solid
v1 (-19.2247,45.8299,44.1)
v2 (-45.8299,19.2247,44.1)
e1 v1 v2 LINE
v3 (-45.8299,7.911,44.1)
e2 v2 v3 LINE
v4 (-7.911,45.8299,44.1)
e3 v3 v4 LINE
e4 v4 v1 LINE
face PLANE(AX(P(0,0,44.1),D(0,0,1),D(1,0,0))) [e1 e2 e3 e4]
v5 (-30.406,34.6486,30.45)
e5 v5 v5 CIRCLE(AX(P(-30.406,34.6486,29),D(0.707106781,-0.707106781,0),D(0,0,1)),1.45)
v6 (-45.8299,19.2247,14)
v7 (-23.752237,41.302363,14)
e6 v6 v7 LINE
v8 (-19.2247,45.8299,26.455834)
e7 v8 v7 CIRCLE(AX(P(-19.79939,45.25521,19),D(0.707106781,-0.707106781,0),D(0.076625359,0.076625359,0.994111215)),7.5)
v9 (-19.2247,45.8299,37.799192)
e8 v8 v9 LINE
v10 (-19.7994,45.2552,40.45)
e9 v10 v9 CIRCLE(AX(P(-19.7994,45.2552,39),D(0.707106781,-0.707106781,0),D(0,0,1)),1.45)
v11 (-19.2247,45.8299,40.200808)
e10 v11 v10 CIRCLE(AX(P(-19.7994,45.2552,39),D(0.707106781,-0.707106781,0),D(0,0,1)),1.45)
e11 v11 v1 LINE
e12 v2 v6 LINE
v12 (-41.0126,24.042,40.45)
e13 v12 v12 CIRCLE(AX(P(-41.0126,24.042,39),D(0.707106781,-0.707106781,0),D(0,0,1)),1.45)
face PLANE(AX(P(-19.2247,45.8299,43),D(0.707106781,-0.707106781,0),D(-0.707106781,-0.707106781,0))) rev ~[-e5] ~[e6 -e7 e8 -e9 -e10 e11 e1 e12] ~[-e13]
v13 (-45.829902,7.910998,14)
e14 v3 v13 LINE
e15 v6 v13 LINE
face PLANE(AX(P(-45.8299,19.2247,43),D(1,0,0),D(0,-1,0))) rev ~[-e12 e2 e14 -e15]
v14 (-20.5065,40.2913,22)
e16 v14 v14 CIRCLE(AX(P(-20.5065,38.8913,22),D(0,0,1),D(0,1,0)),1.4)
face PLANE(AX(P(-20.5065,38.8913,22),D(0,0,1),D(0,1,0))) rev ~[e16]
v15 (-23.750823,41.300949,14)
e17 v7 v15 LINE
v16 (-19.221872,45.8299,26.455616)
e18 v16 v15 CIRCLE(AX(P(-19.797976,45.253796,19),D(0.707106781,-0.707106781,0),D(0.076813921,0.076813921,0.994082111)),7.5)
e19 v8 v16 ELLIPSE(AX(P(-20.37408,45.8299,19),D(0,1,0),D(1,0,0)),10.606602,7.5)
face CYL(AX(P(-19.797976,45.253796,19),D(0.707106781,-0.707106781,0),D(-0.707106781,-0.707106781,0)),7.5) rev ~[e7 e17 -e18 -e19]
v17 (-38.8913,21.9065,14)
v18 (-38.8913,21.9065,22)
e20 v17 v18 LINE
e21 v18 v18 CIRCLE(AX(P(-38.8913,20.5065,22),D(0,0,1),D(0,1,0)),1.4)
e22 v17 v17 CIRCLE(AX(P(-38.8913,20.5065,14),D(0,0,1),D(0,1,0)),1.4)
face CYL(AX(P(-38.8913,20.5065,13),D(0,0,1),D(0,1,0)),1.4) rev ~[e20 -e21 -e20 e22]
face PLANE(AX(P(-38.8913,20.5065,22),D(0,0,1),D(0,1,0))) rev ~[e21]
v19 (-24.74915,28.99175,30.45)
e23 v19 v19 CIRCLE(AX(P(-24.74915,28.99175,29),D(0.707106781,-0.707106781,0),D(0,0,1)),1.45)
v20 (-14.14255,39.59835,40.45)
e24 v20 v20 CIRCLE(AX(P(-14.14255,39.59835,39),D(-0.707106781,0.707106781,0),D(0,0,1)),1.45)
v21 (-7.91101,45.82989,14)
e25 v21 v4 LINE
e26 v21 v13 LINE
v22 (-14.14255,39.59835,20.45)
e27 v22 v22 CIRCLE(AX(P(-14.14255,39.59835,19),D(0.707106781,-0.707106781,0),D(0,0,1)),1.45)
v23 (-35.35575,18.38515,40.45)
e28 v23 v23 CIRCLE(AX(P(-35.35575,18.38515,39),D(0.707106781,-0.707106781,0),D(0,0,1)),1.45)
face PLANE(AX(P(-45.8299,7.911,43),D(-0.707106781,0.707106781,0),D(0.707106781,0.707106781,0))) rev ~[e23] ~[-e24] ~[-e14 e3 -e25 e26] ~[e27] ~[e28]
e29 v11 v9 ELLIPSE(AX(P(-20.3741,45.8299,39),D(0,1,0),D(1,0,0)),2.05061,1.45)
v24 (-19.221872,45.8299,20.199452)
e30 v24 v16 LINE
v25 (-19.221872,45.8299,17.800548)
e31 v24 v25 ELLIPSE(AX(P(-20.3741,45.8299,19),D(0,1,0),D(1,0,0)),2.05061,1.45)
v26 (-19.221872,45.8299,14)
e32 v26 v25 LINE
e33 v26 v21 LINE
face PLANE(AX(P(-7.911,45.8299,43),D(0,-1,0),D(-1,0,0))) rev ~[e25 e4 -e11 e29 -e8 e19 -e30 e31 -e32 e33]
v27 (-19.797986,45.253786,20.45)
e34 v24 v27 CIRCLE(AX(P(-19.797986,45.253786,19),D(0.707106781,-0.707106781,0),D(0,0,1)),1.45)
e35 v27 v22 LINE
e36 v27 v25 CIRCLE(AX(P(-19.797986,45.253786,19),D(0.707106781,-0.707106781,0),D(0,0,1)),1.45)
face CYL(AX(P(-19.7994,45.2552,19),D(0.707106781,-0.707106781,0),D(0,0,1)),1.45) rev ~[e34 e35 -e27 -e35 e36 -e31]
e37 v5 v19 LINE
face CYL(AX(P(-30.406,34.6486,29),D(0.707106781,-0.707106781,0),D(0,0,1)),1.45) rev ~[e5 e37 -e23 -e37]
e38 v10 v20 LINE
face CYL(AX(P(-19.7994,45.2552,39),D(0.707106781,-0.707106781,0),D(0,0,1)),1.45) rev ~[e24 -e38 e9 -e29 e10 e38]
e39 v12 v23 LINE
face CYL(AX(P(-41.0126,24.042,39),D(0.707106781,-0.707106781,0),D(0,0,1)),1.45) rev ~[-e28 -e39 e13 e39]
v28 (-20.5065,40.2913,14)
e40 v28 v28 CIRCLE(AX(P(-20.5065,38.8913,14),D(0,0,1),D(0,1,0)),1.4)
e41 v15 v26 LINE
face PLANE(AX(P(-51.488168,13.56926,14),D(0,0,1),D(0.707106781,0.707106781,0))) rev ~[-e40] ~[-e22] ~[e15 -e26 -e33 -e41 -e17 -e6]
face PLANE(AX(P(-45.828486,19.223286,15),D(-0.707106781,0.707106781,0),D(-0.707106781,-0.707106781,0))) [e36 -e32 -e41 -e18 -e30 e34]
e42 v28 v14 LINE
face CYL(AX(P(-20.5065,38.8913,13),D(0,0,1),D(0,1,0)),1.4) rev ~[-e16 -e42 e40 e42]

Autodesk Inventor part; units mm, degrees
ref_plane "YZ Plane" through (0, 0, 0) normal (1, 0, 0) x (0, 1, 0)
ref_plane "Work Plane1" through (0, 0, 10) normal (0, 0, 1) x (1, 0, 0)
sketch "Sketch1" plane through (0, 0, 10) normal (0, 0, 1) x (1, 0, 0)
  line L0 (-4.0299, -0.3538) -> (-2.2322, 1.4439) construction
  arc A0 (-1.4439, 2.2322) -> (-2.2322, 1.4439) centre (-0.9299, 0.9299) ccw construction
  line L1 (-1.4439, 2.2322) -> (0.3538, 4.0299) construction
  line L2 (-37.8299, 42.8299) -> (-37.8299, 37.8299) construction
  line L3 (-37.8299, 37.8299) -> (-42.9208, 37.8299) construction
  line L4 (-37.8299, 42.2137) -> (-37.8299, 45.8299) construction
  line L5 (-37.8299, 45.8299) -> (-4.0299, 45.8299) construction
  line L6 (-4.0299, 45.8299) -> (-4.0299, 42.2137) construction
  line L7 (-4.0299, 4.0299) -> (0.3538, 4.0299) projected
  circle A1 centre (-20.9299, 20.9299) radius 17.5 projected
  line L8 (-20.9299, 58.9723) -> (17.1124, 20.9299) construction
  line L9 (17.1124, 20.9299) -> (-20.9299, -17.1124) construction
  line L10 (-20.9299, -17.1124) -> (-58.9723, 20.9299) construction
  line L11 (-58.9723, 20.9299) -> (-20.9299, 58.9723) construction
  line L12 (-20.9299, 58.9723) -> (-20.9299, -17.1124) construction
  line L13 (17.1124, 20.9299) -> (-58.9723, 20.9299) construction
  line L14 (-20.9299, 58.9723) -> (32.8701, 58.9723) construction
  line L15 (-43.4299, 43.4299) -> (1.5701, 43.4299) construction
  line L16 (1.5701, 43.4299) -> (1.5701, -1.5701) construction
  line L17 (1.5701, -1.5701) -> (-43.4299, -1.5701) construction
  line L18 (-43.4299, -1.5701) -> (-43.4299, 43.4299) construction
  line L19 (-43.4299, 43.4299) -> (1.5701, -1.5701) construction
  line L20 (1.5701, 43.4299) -> (-43.4299, -1.5701) construction
  line L21 (-43.4299, 5.3876) -> (-43.4299, 36.4723)
  line L22 (-43.4299, 36.4723) -> (-36.4723, 43.4299)
  line L23 (-36.4723, 43.4299) -> (-5.3876, 43.4299)
  line L24 (-5.3876, 43.4299) -> (1.5701, 36.4723)
  line L25 (1.5701, 36.4723) -> (1.5701, 5.3876)
  line L26 (1.5701, 5.3876) -> (-5.3876, -1.5701)
  line L27 (-5.3876, -1.5701) -> (-36.4723, -1.5701)
  line L28 (-36.4723, -1.5701) -> (-43.4299, 5.3876)
  line L29 (-4.0299, 42.2137) -> (-37.8299, 42.2137) projected
  line L30 (-4.0299, -0.3538) -> (-4.0299, 4.0299) projected
  circle A2 centre (-20.9299, 20.9299) radius 1.4
  line L31 (-10.9299, 10.9299) -> (-30.9299, 10.9299) construction
  line L32 (-30.9299, 10.9299) -> (-30.9299, 30.9299) construction
  line L33 (-30.9299, 30.9299) -> (-10.9299, 30.9299) construction
  line L34 (-10.9299, 30.9299) -> (-10.9299, 10.9299) construction
  line L35 (-10.9299, 10.9299) -> (-30.9299, 30.9299) construction
  line L36 (-30.9299, 10.9299) -> (-10.9299, 30.9299) construction
  circle A3 centre (-30.9299, 30.9299) radius 1.4
  circle A4 centre (-30.9299, 10.9299) radius 1.4
  circle A5 centre (-10.9299, 10.9299) radius 1.4
  line L37 (-45.8299, 37.8299) -> (-42.0723, 37.8299) construction
  line L38 (-42.1723, 37.7299) -> (-45.8299, 37.7299)
  line L39 (-45.8299, 37.7299) -> (-45.8299, 4.1299)
  line L40 (-45.8299, 4.1299) -> (-42.1723, 4.1299)
  line L41 (-42.1723, 4.1299) -> (-42.1723, 37.7299)
  line L42 (-45.8299, 4.0299) -> (-42.0723, 4.0299) construction
  line L43 (-45.8299, 37.8299) -> (-42.0723, 37.8299) projected
  line L44 (-37.7299, 45.8299) -> (-4.1299, 45.8299)
  line L45 (-4.1299, 45.8299) -> (-4.1299, 42.1723)
  line L46 (-4.1299, 42.1723) -> (-37.7299, 42.1723)
  line L47 (-37.7299, 42.1723) -> (-37.7299, 45.8299)
  line L48 (0.4701, 37.8299) -> (0.4701, 4.0299) construction
  line L49 (0.4701, 4.0299) -> (3.9701, 4.0299) construction
  line L50 (3.9701, 37.8299) -> (3.9701, 4.0299) construction
  line L51 (0.4701, 37.8299) -> (3.9701, 37.8299) construction
  line L52 (-45.8299, -3.9701) -> (-4.0299, -3.9701) construction
  line L53 (0.3124, 37.7299) -> (3.9701, 37.7299)
  line L54 (3.9701, 37.7299) -> (3.9701, 4.1299)
  line L55 (3.9701, 4.1299) -> (0.3124, 4.1299)
  line L56 (0.3124, 4.1299) -> (0.3124, 37.7299)
  line L57 (-4.1713, -0.3538) -> (-37.7299, -0.3538)
  line L58 (-37.7299, -0.3538) -> (-37.7299, -3.9701)
  line L59 (-37.7299, -3.9701) -> (-4.1713, -3.9701)
  line L60 (-4.1713, -3.9701) -> (-4.1713, -0.3538)
  point P0 (-37.8299, 4.0299)
  dimension "d18" = 53.8
  dimension "d19" = 45
  dimension "d20" = 53.8
  dimension "d21" = 45
  dimension "d22" = 45
  dimension "d30" = 20
  dimension "d31" = 20
  dimension "d32" = 2.8
  dimension "d33" = 2.8
  dimension "d34" = 2.8
  dimension "d35" = 2.8
  dimension "d36" = 0.1
  dimension "d37" = 0.1
  dimension "d38" = 0.1
  dimension "d39" = 0.1
extrude "Extrusion1" add sketch "Sketch1" along normal blind 5 contours L30 L26 L57 L28 L41 L22 L46 L24 L56 L7 | L7 L26 L30 | L56 L24 L25 L26 | L26 L25 L24 L53 L54 L55 | L60 L59 L58 L57 L28 L27 L26 | L26 L27 L28 L57 | L46 L22 L29 L24 | L24 L29 L45 | L40 L39 L38 L22 L21 L28 | L28 L21 L22 L41 | L29 L22 L23 L24 | L24 L23 L22 L29 L47 L44 L45 | L47 L29 L22 | A1 | A2 | A3 | A4 | A5
sketch "Sketch4" plane through (0, 0, 15) normal (0, 0, 1) x (1, 0, 0)
  line L0 (-37.7299, 42.1723) -> (-42.1723, 37.7299) projected
  line L1 (-42.1723, 37.7299) -> (-45.8299, 37.7299) projected
  line L2 (-45.8299, 37.7299) -> (-45.8299, 4.1299) projected
  line L3 (-45.8299, 4.1299) -> (-42.1723, 4.1299) projected
  line L4 (-42.1723, 4.1299) -> (-37.6885, -0.3538) projected
  line L5 (-37.6885, -0.3538) -> (-37.7299, -0.3538) projected
  line L6 (-37.7299, -0.3538) -> (-37.7299, -3.9701) projected
  line L7 (-37.7299, -3.9701) -> (-4.1713, -3.9701) projected
  line L8 (-4.1713, -3.9701) -> (-4.1713, -0.3538) projected
  line L9 (-4.1713, -0.3538) -> (0.3124, 4.1299) projected
  line L10 (0.3124, 4.1299) -> (3.9701, 4.1299) projected
  line L11 (3.9701, 4.1299) -> (3.9701, 37.7299) projected
  line L12 (3.9701, 37.7299) -> (0.3124, 37.7299) projected
  line L13 (0.3124, 37.7299) -> (-4.1299, 42.1723) projected
  line L14 (-4.1299, 42.1723) -> (-4.1299, 45.8299) projected
  line L15 (-4.1299, 45.8299) -> (-37.7299, 45.8299) projected
  line L16 (-37.7299, 45.8299) -> (-37.7299, 42.1723) projected
  line L17 (-45.8299, 37.7299) -> (-45.8299, 4.1299) projected
  line L18 (-45.8299, 7.911) -> (-7.911, 45.8299)
  line L19 (-45.8299, 7.911) -> (7.7955, 7.911) construction
  line L20 (-7.911, 45.8299) -> (-19.2247, 45.8299)
  line L21 (-4.1299, 45.8299) -> (-37.7299, 45.8299) projected
  line L22 (-19.2247, 45.8299) -> (-45.8299, 19.2247)
  line L23 (-45.8299, 7.911) -> (-45.8299, 19.2247)
  circle A0 centre (-40.9299, 0.9299) radius 1.1933 projected
  circle A1 centre (-0.9299, 40.9299) radius 1.4 projected
  line L24 (-40.9299, 0.9299) -> (-0.9299, 40.9299)
  line L25 (0.3124, 37.7299) -> (-4.1299, 42.1723) projected
  point P0 (0, 0)
  dimension "d40" = 45
  dimension "d41" = 8
extrude "Extrusion4" add sketch "Sketch4" along normal blind 28 contours L15 L18 L2 L22
sketch "Sketch5" plane through (-45.8299, 19.2247, 15) normal (-0.7071068, 0.7071068, 0) x (-0.7071068, -0.7071068, 0)
  line L0 (0, 0) -> (-37.6254, 0) projected
  line L1 (0, 0) -> (0, 28) projected
  line L2 (-37.6254, 28) -> (0, 28) projected
  line L3 (-37.6254, 0) -> (-37.6254, 28) projected
  circle A0 centre (-18.8127, 9.1873) radius 18.8127
  line L4 (-6.8127, 24) -> (-36.8127, 24) construction
  line L5 (-36.8127, 24) -> (-36.8127, 4) construction
  line L6 (-36.8127, 4) -> (-6.8127, 4) construction
  line L7 (-6.8127, 4) -> (-6.8127, 24) construction
  line L8 (-6.8127, 24) -> (-36.8127, 4) construction
  line L9 (-36.8127, 24) -> (-6.8127, 4) construction
  point P0 (-18.8127, -15)
  point P1 (-21.8127, 14)
  dimension "d44" = 30
  dimension "d45" = 20
hole "Hole1" at (-19.7994, 45.2552, 39) at (-19.7994, 45.2552, 19) at (-41.0126, 24.042, 39) at (-30.406, 34.6486, 29) direction (0.7071068, -0.7071068, 0) diameter 2.9 depth 12
sketch "Sketch6" plane through (-37.7299, -3.9701, 10) normal (0, -1, 0) x (1, 0, 0)
  circle A0 centre (-3.2, 36.9) radius 1.45 projected
  circle A1 centre (36.8, 36.9) radius 1.45 projected
  line L0 (-6.1, 0) -> (-6.1, 39.8) projected
  line L1 (-0.1, 0) -> (-6.1, 0) projected
  line L2 (-0.1, 33.8) -> (-0.1, 0) projected
  line L3 (33.7, 33.8) -> (-0.1, 33.8) projected
  line L4 (33.7, 33.8) -> (33.7, 0) projected
  line L5 (39.7, 0) -> (33.7, 0) projected
  line L6 (39.7, 39.8) -> (39.7, 0) projected
  line L7 (-6.1, 39.8) -> (39.7, 39.8) projected
  circle A2 centre (16.8, 16.9) radius 16.9
  circle A3 centre (16.8, 16.9) radius 14.9
  line L8 (-0.1, 16.9) -> (-0.1, 0)
  line L9 (0, 0) -> (33.5586, 0) projected
  line L10 (0.0414, 0) -> (-4.4423, 0) projected
  line L11 (33.5586, 0) -> (0.0414, 0)
  line L12 (33.7, 16.9) -> (33.5586, 0)
  point P0 (37.7299, -10)
  dimension "d53" = 2
extrude "Extrusion5" cut sketch "Sketch6" against normal up to surface contours A3 surface through (-45.8299, 7.911, 15) normal (0.7071068, -0.7071068, 0)
ref_plane "Work Plane3" through (3.9701, 45.8299, 26) normal (1, 0, 0) x (0, -1, 0)
sketch "Sketch7" plane through (3.9701, 45.8299, 26) normal (1, 0, 0) x (0, -1, 0)
  line L0 (41.8, -17.8) -> (41.8, 16) projected
  line L1 (8, -17.8) -> (41.8, -17.8) projected
  line L2 (8, -17.8) -> (8, 16) projected
  circle A0 centre (24.9, -0.9) radius 16.9
  circle A1 centre (24.9, -0.9) radius 14.9
  point P0 (45.8299, 26)
  dimension "d56" = 2
ref_plane "Work Plane4" through (-34.8055, 8.3289, 16.6138) normal (0.7071068, -0.7071068, 0) x (0.7071068, 0.7071068, 0)
extrude "Extrusion6" cut sketch "Sketch7" against normal up to surface contours A1 surface through (-45.8299, 7.911, 15) normal (0.7071068, -0.7071068, 0)
sketch "Sketch8" plane through (-45.8299, 19.2247, 15) normal (-0.7071068, 0.7071068, 0) x (-0.7071068, -0.7071068, 0)
  arc A0 (-37.6254, 2.7992) -> (-37.6254, 5.2008) centre (-36.8127, 4) ccw projected
  circle A1 centre (-36.8127, 4) radius 7.5
  point P0 (-18.8127, -15)
  dimension "d59" = 15
extrude "Extrusion7" cut sketch "Sketch8" along normal blind 10
sketch "Sketch9" plane through (0, 0, 10) normal (0, 0, -1) x (-1, 0, 0)
  line L0 (45.8299, 19.2247) -> (24.2855, 40.7692) projected
  line L1 (41.7776, 11.9633) -> (26.8705, 26.8705) projected
  line L2 (26.8705, 26.8705) -> (11.9633, 41.7776) projected
  line L3 (19.2247, 45.8299) -> (24.2855, 40.7692) projected
  line L4 (7.911, 45.8299) -> (11.9633, 41.7776) projected
  line L5 (41.7776, 11.9633) -> (45.8299, 7.911) projected
  line L6 (15.1679, 38.5731) -> (20.8247, 44.2299) projected
  line L7 (13.1172, 40.6237) -> (18.3235, 45.8299) projected
  line L8 (34.3304, 19.4105) -> (39.9873, 25.0673) projected
  line L9 (36.3811, 17.3599) -> (42.0379, 23.0167) projected
  circle A0 centre (20.5065, 38.8913) radius 1.4
  line L10 (25.7745, 27.9665) -> (31.4313, 33.6233) projected
  line L11 (31.4313, 33.6233) -> (25.7745, 27.9665)
  line L12 (26.8705, 26.8705) -> (32.5273, 32.5273)
  circle A1 centre (38.8913, 20.5065) radius 1.4
  point P0 (0, 0)
  point P1 (34.7528, 24.7491)
  dimension "d62" = 2.8
hole "Hole2" at (-20.5065, 38.8913, 10) at (-38.8913, 20.5065, 10) direction (0, 0, 1) diameter 2.8 depth 12 counterbore diameter 5.5 counterbore depth 3
sketch "Sketch11" plane through (0, 0, 43) normal (0, 0, 1) x (1, 0, 0)
  line L0 (-7.911, 45.8299) -> (-19.2247, 45.8299) projected
  line L1 (-19.2247, 45.8299) -> (-45.8299, 19.2247) projected
  line L2 (-45.8299, 19.2247) -> (-45.8299, 7.911) projected
  line L3 (-45.8299, 7.911) -> (-7.911, 45.8299) projected
  line L4 (-45.8299, 37.7299) -> (-45.8299, 19.2247) projected
  line L5 (-42.1723, 37.7299) -> (-45.8299, 37.7299) projected
  line L6 (-37.7299, 42.1723) -> (-42.1723, 37.7299) projected
  line L7 (-37.7299, 45.8299) -> (-37.7299, 42.1723) projected
  line L8 (-29.3463, 45.8299) -> (-37.7299, 45.8299) projected
  line L9 (-29.3463, 45.8299) -> (-19.2247, 45.8299) projected
  line L10 (-4.1299, 45.8299) -> (-7.911, 45.8299) projected
  line L11 (-4.1299, 42.1723) -> (-4.1299, 45.8299) projected
  line L12 (0.3124, 37.7299) -> (-4.1299, 42.1723) projected
  line L13 (3.9701, 37.7299) -> (0.3124, 37.7299) projected
  line L14 (3.9701, 29.8965) -> (3.9701, 11.9633) projected
  line L15 (3.9701, 29.8965) -> (3.9701, 37.7299) projected
  line L16 (-11.9633, -3.9701) -> (-4.1713, -3.9701) projected
  line L17 (-4.1713, -3.9701) -> (-4.1713, -0.3538) projected
  line L18 (-4.1713, -0.3538) -> (0.3124, 4.1299) projected
  line L19 (0.3124, 4.1299) -> (3.9701, 4.1299) projected
  line L20 (3.9701, 4.1299) -> (3.9701, 11.9633) projected
  line L21 (-11.9633, -3.9701) -> (-29.8965, -3.9701) projected
  line L22 (-37.7299, -3.9701) -> (-29.8965, -3.9701) projected
  line L23 (-37.7299, -0.3538) -> (-37.7299, -3.9701) projected
  line L24 (-45.8299, 7.911) -> (-7.911, 45.8299) projected
  line L25 (-45.8299, 7.911) -> (-7.911, 45.8299)
  line L26 (-45.8299, 7.911) -> (-45.8299, 4.1299) projected
  line L27 (-45.8299, 4.1299) -> (-42.1723, 4.1299) projected
  line L28 (-37.6885, -0.3538) -> (-37.7299, -0.3538) projected
  line L29 (-42.1723, 4.1299) -> (-37.6885, -0.3538) projected
  point P0 (0, 0)
extrude "Extrusion8" cut sketch "Sketch11" against normal through all contours L10 L11 L12 L13 L15 L14 L20 L19 L18 L17 L16 L21 L22 L23 L28 L29 L27 L26 L3 | L1 L4 L5 L6 L7 L8 L9
sketch "Sketch12" plane through (-45.8299, 19.2247, 10) normal (-0.7071068, 0.7071068, 0) x (-0.7071068, -0.7071068, 0)
  line L0 (-45.6254, 33) -> (-45.6254, 0) projected
  line L1 (8, 0) -> (8, 33) projected
  line L2 (-45.6254, 0) -> (8, 0)
  line L3 (8, 0) -> (8, 4)
  line L4 (8, 4) -> (-45.6254, 4)
  line L5 (-45.6254, 4) -> (-45.6254, 0)
  point P0 (-18.8127, -10)
  point P1 (45.6254, -4)
  point P2 (45.6254, -5)
  point P3 (-8, -5)
  point P4 (-8, -4)
  dimension "d73" = 4
extrude "Extrusion9" cut sketch "Sketch12" against normal blind 29
sketch "Sketch13" plane through (0, 0, 43) normal (0, 0, 1) x (1, 0, 0)
  line L0 (-7.911, 45.8299) -> (-19.2247, 45.8299) projected
  line L1 (-19.2247, 45.8299) -> (-45.8299, 19.2247) projected
  line L2 (-45.8299, 19.2247) -> (-45.8299, 7.911) projected
  line L3 (-45.8299, 7.911) -> (-7.911, 45.8299) projected
  point P0 (0, 0)
ref_plane "Work Plane5" through (-45.7299, 3.9099, 44.1) normal (0, 0, -1) x (0, 1, 0)
extrude "Extrusion10" add sketch "Sketch13" along normal up to surface (1.1 mm away)
properties part number "20_Cube_Insert_Kinematic_Mirrormount_45_base_part2"
